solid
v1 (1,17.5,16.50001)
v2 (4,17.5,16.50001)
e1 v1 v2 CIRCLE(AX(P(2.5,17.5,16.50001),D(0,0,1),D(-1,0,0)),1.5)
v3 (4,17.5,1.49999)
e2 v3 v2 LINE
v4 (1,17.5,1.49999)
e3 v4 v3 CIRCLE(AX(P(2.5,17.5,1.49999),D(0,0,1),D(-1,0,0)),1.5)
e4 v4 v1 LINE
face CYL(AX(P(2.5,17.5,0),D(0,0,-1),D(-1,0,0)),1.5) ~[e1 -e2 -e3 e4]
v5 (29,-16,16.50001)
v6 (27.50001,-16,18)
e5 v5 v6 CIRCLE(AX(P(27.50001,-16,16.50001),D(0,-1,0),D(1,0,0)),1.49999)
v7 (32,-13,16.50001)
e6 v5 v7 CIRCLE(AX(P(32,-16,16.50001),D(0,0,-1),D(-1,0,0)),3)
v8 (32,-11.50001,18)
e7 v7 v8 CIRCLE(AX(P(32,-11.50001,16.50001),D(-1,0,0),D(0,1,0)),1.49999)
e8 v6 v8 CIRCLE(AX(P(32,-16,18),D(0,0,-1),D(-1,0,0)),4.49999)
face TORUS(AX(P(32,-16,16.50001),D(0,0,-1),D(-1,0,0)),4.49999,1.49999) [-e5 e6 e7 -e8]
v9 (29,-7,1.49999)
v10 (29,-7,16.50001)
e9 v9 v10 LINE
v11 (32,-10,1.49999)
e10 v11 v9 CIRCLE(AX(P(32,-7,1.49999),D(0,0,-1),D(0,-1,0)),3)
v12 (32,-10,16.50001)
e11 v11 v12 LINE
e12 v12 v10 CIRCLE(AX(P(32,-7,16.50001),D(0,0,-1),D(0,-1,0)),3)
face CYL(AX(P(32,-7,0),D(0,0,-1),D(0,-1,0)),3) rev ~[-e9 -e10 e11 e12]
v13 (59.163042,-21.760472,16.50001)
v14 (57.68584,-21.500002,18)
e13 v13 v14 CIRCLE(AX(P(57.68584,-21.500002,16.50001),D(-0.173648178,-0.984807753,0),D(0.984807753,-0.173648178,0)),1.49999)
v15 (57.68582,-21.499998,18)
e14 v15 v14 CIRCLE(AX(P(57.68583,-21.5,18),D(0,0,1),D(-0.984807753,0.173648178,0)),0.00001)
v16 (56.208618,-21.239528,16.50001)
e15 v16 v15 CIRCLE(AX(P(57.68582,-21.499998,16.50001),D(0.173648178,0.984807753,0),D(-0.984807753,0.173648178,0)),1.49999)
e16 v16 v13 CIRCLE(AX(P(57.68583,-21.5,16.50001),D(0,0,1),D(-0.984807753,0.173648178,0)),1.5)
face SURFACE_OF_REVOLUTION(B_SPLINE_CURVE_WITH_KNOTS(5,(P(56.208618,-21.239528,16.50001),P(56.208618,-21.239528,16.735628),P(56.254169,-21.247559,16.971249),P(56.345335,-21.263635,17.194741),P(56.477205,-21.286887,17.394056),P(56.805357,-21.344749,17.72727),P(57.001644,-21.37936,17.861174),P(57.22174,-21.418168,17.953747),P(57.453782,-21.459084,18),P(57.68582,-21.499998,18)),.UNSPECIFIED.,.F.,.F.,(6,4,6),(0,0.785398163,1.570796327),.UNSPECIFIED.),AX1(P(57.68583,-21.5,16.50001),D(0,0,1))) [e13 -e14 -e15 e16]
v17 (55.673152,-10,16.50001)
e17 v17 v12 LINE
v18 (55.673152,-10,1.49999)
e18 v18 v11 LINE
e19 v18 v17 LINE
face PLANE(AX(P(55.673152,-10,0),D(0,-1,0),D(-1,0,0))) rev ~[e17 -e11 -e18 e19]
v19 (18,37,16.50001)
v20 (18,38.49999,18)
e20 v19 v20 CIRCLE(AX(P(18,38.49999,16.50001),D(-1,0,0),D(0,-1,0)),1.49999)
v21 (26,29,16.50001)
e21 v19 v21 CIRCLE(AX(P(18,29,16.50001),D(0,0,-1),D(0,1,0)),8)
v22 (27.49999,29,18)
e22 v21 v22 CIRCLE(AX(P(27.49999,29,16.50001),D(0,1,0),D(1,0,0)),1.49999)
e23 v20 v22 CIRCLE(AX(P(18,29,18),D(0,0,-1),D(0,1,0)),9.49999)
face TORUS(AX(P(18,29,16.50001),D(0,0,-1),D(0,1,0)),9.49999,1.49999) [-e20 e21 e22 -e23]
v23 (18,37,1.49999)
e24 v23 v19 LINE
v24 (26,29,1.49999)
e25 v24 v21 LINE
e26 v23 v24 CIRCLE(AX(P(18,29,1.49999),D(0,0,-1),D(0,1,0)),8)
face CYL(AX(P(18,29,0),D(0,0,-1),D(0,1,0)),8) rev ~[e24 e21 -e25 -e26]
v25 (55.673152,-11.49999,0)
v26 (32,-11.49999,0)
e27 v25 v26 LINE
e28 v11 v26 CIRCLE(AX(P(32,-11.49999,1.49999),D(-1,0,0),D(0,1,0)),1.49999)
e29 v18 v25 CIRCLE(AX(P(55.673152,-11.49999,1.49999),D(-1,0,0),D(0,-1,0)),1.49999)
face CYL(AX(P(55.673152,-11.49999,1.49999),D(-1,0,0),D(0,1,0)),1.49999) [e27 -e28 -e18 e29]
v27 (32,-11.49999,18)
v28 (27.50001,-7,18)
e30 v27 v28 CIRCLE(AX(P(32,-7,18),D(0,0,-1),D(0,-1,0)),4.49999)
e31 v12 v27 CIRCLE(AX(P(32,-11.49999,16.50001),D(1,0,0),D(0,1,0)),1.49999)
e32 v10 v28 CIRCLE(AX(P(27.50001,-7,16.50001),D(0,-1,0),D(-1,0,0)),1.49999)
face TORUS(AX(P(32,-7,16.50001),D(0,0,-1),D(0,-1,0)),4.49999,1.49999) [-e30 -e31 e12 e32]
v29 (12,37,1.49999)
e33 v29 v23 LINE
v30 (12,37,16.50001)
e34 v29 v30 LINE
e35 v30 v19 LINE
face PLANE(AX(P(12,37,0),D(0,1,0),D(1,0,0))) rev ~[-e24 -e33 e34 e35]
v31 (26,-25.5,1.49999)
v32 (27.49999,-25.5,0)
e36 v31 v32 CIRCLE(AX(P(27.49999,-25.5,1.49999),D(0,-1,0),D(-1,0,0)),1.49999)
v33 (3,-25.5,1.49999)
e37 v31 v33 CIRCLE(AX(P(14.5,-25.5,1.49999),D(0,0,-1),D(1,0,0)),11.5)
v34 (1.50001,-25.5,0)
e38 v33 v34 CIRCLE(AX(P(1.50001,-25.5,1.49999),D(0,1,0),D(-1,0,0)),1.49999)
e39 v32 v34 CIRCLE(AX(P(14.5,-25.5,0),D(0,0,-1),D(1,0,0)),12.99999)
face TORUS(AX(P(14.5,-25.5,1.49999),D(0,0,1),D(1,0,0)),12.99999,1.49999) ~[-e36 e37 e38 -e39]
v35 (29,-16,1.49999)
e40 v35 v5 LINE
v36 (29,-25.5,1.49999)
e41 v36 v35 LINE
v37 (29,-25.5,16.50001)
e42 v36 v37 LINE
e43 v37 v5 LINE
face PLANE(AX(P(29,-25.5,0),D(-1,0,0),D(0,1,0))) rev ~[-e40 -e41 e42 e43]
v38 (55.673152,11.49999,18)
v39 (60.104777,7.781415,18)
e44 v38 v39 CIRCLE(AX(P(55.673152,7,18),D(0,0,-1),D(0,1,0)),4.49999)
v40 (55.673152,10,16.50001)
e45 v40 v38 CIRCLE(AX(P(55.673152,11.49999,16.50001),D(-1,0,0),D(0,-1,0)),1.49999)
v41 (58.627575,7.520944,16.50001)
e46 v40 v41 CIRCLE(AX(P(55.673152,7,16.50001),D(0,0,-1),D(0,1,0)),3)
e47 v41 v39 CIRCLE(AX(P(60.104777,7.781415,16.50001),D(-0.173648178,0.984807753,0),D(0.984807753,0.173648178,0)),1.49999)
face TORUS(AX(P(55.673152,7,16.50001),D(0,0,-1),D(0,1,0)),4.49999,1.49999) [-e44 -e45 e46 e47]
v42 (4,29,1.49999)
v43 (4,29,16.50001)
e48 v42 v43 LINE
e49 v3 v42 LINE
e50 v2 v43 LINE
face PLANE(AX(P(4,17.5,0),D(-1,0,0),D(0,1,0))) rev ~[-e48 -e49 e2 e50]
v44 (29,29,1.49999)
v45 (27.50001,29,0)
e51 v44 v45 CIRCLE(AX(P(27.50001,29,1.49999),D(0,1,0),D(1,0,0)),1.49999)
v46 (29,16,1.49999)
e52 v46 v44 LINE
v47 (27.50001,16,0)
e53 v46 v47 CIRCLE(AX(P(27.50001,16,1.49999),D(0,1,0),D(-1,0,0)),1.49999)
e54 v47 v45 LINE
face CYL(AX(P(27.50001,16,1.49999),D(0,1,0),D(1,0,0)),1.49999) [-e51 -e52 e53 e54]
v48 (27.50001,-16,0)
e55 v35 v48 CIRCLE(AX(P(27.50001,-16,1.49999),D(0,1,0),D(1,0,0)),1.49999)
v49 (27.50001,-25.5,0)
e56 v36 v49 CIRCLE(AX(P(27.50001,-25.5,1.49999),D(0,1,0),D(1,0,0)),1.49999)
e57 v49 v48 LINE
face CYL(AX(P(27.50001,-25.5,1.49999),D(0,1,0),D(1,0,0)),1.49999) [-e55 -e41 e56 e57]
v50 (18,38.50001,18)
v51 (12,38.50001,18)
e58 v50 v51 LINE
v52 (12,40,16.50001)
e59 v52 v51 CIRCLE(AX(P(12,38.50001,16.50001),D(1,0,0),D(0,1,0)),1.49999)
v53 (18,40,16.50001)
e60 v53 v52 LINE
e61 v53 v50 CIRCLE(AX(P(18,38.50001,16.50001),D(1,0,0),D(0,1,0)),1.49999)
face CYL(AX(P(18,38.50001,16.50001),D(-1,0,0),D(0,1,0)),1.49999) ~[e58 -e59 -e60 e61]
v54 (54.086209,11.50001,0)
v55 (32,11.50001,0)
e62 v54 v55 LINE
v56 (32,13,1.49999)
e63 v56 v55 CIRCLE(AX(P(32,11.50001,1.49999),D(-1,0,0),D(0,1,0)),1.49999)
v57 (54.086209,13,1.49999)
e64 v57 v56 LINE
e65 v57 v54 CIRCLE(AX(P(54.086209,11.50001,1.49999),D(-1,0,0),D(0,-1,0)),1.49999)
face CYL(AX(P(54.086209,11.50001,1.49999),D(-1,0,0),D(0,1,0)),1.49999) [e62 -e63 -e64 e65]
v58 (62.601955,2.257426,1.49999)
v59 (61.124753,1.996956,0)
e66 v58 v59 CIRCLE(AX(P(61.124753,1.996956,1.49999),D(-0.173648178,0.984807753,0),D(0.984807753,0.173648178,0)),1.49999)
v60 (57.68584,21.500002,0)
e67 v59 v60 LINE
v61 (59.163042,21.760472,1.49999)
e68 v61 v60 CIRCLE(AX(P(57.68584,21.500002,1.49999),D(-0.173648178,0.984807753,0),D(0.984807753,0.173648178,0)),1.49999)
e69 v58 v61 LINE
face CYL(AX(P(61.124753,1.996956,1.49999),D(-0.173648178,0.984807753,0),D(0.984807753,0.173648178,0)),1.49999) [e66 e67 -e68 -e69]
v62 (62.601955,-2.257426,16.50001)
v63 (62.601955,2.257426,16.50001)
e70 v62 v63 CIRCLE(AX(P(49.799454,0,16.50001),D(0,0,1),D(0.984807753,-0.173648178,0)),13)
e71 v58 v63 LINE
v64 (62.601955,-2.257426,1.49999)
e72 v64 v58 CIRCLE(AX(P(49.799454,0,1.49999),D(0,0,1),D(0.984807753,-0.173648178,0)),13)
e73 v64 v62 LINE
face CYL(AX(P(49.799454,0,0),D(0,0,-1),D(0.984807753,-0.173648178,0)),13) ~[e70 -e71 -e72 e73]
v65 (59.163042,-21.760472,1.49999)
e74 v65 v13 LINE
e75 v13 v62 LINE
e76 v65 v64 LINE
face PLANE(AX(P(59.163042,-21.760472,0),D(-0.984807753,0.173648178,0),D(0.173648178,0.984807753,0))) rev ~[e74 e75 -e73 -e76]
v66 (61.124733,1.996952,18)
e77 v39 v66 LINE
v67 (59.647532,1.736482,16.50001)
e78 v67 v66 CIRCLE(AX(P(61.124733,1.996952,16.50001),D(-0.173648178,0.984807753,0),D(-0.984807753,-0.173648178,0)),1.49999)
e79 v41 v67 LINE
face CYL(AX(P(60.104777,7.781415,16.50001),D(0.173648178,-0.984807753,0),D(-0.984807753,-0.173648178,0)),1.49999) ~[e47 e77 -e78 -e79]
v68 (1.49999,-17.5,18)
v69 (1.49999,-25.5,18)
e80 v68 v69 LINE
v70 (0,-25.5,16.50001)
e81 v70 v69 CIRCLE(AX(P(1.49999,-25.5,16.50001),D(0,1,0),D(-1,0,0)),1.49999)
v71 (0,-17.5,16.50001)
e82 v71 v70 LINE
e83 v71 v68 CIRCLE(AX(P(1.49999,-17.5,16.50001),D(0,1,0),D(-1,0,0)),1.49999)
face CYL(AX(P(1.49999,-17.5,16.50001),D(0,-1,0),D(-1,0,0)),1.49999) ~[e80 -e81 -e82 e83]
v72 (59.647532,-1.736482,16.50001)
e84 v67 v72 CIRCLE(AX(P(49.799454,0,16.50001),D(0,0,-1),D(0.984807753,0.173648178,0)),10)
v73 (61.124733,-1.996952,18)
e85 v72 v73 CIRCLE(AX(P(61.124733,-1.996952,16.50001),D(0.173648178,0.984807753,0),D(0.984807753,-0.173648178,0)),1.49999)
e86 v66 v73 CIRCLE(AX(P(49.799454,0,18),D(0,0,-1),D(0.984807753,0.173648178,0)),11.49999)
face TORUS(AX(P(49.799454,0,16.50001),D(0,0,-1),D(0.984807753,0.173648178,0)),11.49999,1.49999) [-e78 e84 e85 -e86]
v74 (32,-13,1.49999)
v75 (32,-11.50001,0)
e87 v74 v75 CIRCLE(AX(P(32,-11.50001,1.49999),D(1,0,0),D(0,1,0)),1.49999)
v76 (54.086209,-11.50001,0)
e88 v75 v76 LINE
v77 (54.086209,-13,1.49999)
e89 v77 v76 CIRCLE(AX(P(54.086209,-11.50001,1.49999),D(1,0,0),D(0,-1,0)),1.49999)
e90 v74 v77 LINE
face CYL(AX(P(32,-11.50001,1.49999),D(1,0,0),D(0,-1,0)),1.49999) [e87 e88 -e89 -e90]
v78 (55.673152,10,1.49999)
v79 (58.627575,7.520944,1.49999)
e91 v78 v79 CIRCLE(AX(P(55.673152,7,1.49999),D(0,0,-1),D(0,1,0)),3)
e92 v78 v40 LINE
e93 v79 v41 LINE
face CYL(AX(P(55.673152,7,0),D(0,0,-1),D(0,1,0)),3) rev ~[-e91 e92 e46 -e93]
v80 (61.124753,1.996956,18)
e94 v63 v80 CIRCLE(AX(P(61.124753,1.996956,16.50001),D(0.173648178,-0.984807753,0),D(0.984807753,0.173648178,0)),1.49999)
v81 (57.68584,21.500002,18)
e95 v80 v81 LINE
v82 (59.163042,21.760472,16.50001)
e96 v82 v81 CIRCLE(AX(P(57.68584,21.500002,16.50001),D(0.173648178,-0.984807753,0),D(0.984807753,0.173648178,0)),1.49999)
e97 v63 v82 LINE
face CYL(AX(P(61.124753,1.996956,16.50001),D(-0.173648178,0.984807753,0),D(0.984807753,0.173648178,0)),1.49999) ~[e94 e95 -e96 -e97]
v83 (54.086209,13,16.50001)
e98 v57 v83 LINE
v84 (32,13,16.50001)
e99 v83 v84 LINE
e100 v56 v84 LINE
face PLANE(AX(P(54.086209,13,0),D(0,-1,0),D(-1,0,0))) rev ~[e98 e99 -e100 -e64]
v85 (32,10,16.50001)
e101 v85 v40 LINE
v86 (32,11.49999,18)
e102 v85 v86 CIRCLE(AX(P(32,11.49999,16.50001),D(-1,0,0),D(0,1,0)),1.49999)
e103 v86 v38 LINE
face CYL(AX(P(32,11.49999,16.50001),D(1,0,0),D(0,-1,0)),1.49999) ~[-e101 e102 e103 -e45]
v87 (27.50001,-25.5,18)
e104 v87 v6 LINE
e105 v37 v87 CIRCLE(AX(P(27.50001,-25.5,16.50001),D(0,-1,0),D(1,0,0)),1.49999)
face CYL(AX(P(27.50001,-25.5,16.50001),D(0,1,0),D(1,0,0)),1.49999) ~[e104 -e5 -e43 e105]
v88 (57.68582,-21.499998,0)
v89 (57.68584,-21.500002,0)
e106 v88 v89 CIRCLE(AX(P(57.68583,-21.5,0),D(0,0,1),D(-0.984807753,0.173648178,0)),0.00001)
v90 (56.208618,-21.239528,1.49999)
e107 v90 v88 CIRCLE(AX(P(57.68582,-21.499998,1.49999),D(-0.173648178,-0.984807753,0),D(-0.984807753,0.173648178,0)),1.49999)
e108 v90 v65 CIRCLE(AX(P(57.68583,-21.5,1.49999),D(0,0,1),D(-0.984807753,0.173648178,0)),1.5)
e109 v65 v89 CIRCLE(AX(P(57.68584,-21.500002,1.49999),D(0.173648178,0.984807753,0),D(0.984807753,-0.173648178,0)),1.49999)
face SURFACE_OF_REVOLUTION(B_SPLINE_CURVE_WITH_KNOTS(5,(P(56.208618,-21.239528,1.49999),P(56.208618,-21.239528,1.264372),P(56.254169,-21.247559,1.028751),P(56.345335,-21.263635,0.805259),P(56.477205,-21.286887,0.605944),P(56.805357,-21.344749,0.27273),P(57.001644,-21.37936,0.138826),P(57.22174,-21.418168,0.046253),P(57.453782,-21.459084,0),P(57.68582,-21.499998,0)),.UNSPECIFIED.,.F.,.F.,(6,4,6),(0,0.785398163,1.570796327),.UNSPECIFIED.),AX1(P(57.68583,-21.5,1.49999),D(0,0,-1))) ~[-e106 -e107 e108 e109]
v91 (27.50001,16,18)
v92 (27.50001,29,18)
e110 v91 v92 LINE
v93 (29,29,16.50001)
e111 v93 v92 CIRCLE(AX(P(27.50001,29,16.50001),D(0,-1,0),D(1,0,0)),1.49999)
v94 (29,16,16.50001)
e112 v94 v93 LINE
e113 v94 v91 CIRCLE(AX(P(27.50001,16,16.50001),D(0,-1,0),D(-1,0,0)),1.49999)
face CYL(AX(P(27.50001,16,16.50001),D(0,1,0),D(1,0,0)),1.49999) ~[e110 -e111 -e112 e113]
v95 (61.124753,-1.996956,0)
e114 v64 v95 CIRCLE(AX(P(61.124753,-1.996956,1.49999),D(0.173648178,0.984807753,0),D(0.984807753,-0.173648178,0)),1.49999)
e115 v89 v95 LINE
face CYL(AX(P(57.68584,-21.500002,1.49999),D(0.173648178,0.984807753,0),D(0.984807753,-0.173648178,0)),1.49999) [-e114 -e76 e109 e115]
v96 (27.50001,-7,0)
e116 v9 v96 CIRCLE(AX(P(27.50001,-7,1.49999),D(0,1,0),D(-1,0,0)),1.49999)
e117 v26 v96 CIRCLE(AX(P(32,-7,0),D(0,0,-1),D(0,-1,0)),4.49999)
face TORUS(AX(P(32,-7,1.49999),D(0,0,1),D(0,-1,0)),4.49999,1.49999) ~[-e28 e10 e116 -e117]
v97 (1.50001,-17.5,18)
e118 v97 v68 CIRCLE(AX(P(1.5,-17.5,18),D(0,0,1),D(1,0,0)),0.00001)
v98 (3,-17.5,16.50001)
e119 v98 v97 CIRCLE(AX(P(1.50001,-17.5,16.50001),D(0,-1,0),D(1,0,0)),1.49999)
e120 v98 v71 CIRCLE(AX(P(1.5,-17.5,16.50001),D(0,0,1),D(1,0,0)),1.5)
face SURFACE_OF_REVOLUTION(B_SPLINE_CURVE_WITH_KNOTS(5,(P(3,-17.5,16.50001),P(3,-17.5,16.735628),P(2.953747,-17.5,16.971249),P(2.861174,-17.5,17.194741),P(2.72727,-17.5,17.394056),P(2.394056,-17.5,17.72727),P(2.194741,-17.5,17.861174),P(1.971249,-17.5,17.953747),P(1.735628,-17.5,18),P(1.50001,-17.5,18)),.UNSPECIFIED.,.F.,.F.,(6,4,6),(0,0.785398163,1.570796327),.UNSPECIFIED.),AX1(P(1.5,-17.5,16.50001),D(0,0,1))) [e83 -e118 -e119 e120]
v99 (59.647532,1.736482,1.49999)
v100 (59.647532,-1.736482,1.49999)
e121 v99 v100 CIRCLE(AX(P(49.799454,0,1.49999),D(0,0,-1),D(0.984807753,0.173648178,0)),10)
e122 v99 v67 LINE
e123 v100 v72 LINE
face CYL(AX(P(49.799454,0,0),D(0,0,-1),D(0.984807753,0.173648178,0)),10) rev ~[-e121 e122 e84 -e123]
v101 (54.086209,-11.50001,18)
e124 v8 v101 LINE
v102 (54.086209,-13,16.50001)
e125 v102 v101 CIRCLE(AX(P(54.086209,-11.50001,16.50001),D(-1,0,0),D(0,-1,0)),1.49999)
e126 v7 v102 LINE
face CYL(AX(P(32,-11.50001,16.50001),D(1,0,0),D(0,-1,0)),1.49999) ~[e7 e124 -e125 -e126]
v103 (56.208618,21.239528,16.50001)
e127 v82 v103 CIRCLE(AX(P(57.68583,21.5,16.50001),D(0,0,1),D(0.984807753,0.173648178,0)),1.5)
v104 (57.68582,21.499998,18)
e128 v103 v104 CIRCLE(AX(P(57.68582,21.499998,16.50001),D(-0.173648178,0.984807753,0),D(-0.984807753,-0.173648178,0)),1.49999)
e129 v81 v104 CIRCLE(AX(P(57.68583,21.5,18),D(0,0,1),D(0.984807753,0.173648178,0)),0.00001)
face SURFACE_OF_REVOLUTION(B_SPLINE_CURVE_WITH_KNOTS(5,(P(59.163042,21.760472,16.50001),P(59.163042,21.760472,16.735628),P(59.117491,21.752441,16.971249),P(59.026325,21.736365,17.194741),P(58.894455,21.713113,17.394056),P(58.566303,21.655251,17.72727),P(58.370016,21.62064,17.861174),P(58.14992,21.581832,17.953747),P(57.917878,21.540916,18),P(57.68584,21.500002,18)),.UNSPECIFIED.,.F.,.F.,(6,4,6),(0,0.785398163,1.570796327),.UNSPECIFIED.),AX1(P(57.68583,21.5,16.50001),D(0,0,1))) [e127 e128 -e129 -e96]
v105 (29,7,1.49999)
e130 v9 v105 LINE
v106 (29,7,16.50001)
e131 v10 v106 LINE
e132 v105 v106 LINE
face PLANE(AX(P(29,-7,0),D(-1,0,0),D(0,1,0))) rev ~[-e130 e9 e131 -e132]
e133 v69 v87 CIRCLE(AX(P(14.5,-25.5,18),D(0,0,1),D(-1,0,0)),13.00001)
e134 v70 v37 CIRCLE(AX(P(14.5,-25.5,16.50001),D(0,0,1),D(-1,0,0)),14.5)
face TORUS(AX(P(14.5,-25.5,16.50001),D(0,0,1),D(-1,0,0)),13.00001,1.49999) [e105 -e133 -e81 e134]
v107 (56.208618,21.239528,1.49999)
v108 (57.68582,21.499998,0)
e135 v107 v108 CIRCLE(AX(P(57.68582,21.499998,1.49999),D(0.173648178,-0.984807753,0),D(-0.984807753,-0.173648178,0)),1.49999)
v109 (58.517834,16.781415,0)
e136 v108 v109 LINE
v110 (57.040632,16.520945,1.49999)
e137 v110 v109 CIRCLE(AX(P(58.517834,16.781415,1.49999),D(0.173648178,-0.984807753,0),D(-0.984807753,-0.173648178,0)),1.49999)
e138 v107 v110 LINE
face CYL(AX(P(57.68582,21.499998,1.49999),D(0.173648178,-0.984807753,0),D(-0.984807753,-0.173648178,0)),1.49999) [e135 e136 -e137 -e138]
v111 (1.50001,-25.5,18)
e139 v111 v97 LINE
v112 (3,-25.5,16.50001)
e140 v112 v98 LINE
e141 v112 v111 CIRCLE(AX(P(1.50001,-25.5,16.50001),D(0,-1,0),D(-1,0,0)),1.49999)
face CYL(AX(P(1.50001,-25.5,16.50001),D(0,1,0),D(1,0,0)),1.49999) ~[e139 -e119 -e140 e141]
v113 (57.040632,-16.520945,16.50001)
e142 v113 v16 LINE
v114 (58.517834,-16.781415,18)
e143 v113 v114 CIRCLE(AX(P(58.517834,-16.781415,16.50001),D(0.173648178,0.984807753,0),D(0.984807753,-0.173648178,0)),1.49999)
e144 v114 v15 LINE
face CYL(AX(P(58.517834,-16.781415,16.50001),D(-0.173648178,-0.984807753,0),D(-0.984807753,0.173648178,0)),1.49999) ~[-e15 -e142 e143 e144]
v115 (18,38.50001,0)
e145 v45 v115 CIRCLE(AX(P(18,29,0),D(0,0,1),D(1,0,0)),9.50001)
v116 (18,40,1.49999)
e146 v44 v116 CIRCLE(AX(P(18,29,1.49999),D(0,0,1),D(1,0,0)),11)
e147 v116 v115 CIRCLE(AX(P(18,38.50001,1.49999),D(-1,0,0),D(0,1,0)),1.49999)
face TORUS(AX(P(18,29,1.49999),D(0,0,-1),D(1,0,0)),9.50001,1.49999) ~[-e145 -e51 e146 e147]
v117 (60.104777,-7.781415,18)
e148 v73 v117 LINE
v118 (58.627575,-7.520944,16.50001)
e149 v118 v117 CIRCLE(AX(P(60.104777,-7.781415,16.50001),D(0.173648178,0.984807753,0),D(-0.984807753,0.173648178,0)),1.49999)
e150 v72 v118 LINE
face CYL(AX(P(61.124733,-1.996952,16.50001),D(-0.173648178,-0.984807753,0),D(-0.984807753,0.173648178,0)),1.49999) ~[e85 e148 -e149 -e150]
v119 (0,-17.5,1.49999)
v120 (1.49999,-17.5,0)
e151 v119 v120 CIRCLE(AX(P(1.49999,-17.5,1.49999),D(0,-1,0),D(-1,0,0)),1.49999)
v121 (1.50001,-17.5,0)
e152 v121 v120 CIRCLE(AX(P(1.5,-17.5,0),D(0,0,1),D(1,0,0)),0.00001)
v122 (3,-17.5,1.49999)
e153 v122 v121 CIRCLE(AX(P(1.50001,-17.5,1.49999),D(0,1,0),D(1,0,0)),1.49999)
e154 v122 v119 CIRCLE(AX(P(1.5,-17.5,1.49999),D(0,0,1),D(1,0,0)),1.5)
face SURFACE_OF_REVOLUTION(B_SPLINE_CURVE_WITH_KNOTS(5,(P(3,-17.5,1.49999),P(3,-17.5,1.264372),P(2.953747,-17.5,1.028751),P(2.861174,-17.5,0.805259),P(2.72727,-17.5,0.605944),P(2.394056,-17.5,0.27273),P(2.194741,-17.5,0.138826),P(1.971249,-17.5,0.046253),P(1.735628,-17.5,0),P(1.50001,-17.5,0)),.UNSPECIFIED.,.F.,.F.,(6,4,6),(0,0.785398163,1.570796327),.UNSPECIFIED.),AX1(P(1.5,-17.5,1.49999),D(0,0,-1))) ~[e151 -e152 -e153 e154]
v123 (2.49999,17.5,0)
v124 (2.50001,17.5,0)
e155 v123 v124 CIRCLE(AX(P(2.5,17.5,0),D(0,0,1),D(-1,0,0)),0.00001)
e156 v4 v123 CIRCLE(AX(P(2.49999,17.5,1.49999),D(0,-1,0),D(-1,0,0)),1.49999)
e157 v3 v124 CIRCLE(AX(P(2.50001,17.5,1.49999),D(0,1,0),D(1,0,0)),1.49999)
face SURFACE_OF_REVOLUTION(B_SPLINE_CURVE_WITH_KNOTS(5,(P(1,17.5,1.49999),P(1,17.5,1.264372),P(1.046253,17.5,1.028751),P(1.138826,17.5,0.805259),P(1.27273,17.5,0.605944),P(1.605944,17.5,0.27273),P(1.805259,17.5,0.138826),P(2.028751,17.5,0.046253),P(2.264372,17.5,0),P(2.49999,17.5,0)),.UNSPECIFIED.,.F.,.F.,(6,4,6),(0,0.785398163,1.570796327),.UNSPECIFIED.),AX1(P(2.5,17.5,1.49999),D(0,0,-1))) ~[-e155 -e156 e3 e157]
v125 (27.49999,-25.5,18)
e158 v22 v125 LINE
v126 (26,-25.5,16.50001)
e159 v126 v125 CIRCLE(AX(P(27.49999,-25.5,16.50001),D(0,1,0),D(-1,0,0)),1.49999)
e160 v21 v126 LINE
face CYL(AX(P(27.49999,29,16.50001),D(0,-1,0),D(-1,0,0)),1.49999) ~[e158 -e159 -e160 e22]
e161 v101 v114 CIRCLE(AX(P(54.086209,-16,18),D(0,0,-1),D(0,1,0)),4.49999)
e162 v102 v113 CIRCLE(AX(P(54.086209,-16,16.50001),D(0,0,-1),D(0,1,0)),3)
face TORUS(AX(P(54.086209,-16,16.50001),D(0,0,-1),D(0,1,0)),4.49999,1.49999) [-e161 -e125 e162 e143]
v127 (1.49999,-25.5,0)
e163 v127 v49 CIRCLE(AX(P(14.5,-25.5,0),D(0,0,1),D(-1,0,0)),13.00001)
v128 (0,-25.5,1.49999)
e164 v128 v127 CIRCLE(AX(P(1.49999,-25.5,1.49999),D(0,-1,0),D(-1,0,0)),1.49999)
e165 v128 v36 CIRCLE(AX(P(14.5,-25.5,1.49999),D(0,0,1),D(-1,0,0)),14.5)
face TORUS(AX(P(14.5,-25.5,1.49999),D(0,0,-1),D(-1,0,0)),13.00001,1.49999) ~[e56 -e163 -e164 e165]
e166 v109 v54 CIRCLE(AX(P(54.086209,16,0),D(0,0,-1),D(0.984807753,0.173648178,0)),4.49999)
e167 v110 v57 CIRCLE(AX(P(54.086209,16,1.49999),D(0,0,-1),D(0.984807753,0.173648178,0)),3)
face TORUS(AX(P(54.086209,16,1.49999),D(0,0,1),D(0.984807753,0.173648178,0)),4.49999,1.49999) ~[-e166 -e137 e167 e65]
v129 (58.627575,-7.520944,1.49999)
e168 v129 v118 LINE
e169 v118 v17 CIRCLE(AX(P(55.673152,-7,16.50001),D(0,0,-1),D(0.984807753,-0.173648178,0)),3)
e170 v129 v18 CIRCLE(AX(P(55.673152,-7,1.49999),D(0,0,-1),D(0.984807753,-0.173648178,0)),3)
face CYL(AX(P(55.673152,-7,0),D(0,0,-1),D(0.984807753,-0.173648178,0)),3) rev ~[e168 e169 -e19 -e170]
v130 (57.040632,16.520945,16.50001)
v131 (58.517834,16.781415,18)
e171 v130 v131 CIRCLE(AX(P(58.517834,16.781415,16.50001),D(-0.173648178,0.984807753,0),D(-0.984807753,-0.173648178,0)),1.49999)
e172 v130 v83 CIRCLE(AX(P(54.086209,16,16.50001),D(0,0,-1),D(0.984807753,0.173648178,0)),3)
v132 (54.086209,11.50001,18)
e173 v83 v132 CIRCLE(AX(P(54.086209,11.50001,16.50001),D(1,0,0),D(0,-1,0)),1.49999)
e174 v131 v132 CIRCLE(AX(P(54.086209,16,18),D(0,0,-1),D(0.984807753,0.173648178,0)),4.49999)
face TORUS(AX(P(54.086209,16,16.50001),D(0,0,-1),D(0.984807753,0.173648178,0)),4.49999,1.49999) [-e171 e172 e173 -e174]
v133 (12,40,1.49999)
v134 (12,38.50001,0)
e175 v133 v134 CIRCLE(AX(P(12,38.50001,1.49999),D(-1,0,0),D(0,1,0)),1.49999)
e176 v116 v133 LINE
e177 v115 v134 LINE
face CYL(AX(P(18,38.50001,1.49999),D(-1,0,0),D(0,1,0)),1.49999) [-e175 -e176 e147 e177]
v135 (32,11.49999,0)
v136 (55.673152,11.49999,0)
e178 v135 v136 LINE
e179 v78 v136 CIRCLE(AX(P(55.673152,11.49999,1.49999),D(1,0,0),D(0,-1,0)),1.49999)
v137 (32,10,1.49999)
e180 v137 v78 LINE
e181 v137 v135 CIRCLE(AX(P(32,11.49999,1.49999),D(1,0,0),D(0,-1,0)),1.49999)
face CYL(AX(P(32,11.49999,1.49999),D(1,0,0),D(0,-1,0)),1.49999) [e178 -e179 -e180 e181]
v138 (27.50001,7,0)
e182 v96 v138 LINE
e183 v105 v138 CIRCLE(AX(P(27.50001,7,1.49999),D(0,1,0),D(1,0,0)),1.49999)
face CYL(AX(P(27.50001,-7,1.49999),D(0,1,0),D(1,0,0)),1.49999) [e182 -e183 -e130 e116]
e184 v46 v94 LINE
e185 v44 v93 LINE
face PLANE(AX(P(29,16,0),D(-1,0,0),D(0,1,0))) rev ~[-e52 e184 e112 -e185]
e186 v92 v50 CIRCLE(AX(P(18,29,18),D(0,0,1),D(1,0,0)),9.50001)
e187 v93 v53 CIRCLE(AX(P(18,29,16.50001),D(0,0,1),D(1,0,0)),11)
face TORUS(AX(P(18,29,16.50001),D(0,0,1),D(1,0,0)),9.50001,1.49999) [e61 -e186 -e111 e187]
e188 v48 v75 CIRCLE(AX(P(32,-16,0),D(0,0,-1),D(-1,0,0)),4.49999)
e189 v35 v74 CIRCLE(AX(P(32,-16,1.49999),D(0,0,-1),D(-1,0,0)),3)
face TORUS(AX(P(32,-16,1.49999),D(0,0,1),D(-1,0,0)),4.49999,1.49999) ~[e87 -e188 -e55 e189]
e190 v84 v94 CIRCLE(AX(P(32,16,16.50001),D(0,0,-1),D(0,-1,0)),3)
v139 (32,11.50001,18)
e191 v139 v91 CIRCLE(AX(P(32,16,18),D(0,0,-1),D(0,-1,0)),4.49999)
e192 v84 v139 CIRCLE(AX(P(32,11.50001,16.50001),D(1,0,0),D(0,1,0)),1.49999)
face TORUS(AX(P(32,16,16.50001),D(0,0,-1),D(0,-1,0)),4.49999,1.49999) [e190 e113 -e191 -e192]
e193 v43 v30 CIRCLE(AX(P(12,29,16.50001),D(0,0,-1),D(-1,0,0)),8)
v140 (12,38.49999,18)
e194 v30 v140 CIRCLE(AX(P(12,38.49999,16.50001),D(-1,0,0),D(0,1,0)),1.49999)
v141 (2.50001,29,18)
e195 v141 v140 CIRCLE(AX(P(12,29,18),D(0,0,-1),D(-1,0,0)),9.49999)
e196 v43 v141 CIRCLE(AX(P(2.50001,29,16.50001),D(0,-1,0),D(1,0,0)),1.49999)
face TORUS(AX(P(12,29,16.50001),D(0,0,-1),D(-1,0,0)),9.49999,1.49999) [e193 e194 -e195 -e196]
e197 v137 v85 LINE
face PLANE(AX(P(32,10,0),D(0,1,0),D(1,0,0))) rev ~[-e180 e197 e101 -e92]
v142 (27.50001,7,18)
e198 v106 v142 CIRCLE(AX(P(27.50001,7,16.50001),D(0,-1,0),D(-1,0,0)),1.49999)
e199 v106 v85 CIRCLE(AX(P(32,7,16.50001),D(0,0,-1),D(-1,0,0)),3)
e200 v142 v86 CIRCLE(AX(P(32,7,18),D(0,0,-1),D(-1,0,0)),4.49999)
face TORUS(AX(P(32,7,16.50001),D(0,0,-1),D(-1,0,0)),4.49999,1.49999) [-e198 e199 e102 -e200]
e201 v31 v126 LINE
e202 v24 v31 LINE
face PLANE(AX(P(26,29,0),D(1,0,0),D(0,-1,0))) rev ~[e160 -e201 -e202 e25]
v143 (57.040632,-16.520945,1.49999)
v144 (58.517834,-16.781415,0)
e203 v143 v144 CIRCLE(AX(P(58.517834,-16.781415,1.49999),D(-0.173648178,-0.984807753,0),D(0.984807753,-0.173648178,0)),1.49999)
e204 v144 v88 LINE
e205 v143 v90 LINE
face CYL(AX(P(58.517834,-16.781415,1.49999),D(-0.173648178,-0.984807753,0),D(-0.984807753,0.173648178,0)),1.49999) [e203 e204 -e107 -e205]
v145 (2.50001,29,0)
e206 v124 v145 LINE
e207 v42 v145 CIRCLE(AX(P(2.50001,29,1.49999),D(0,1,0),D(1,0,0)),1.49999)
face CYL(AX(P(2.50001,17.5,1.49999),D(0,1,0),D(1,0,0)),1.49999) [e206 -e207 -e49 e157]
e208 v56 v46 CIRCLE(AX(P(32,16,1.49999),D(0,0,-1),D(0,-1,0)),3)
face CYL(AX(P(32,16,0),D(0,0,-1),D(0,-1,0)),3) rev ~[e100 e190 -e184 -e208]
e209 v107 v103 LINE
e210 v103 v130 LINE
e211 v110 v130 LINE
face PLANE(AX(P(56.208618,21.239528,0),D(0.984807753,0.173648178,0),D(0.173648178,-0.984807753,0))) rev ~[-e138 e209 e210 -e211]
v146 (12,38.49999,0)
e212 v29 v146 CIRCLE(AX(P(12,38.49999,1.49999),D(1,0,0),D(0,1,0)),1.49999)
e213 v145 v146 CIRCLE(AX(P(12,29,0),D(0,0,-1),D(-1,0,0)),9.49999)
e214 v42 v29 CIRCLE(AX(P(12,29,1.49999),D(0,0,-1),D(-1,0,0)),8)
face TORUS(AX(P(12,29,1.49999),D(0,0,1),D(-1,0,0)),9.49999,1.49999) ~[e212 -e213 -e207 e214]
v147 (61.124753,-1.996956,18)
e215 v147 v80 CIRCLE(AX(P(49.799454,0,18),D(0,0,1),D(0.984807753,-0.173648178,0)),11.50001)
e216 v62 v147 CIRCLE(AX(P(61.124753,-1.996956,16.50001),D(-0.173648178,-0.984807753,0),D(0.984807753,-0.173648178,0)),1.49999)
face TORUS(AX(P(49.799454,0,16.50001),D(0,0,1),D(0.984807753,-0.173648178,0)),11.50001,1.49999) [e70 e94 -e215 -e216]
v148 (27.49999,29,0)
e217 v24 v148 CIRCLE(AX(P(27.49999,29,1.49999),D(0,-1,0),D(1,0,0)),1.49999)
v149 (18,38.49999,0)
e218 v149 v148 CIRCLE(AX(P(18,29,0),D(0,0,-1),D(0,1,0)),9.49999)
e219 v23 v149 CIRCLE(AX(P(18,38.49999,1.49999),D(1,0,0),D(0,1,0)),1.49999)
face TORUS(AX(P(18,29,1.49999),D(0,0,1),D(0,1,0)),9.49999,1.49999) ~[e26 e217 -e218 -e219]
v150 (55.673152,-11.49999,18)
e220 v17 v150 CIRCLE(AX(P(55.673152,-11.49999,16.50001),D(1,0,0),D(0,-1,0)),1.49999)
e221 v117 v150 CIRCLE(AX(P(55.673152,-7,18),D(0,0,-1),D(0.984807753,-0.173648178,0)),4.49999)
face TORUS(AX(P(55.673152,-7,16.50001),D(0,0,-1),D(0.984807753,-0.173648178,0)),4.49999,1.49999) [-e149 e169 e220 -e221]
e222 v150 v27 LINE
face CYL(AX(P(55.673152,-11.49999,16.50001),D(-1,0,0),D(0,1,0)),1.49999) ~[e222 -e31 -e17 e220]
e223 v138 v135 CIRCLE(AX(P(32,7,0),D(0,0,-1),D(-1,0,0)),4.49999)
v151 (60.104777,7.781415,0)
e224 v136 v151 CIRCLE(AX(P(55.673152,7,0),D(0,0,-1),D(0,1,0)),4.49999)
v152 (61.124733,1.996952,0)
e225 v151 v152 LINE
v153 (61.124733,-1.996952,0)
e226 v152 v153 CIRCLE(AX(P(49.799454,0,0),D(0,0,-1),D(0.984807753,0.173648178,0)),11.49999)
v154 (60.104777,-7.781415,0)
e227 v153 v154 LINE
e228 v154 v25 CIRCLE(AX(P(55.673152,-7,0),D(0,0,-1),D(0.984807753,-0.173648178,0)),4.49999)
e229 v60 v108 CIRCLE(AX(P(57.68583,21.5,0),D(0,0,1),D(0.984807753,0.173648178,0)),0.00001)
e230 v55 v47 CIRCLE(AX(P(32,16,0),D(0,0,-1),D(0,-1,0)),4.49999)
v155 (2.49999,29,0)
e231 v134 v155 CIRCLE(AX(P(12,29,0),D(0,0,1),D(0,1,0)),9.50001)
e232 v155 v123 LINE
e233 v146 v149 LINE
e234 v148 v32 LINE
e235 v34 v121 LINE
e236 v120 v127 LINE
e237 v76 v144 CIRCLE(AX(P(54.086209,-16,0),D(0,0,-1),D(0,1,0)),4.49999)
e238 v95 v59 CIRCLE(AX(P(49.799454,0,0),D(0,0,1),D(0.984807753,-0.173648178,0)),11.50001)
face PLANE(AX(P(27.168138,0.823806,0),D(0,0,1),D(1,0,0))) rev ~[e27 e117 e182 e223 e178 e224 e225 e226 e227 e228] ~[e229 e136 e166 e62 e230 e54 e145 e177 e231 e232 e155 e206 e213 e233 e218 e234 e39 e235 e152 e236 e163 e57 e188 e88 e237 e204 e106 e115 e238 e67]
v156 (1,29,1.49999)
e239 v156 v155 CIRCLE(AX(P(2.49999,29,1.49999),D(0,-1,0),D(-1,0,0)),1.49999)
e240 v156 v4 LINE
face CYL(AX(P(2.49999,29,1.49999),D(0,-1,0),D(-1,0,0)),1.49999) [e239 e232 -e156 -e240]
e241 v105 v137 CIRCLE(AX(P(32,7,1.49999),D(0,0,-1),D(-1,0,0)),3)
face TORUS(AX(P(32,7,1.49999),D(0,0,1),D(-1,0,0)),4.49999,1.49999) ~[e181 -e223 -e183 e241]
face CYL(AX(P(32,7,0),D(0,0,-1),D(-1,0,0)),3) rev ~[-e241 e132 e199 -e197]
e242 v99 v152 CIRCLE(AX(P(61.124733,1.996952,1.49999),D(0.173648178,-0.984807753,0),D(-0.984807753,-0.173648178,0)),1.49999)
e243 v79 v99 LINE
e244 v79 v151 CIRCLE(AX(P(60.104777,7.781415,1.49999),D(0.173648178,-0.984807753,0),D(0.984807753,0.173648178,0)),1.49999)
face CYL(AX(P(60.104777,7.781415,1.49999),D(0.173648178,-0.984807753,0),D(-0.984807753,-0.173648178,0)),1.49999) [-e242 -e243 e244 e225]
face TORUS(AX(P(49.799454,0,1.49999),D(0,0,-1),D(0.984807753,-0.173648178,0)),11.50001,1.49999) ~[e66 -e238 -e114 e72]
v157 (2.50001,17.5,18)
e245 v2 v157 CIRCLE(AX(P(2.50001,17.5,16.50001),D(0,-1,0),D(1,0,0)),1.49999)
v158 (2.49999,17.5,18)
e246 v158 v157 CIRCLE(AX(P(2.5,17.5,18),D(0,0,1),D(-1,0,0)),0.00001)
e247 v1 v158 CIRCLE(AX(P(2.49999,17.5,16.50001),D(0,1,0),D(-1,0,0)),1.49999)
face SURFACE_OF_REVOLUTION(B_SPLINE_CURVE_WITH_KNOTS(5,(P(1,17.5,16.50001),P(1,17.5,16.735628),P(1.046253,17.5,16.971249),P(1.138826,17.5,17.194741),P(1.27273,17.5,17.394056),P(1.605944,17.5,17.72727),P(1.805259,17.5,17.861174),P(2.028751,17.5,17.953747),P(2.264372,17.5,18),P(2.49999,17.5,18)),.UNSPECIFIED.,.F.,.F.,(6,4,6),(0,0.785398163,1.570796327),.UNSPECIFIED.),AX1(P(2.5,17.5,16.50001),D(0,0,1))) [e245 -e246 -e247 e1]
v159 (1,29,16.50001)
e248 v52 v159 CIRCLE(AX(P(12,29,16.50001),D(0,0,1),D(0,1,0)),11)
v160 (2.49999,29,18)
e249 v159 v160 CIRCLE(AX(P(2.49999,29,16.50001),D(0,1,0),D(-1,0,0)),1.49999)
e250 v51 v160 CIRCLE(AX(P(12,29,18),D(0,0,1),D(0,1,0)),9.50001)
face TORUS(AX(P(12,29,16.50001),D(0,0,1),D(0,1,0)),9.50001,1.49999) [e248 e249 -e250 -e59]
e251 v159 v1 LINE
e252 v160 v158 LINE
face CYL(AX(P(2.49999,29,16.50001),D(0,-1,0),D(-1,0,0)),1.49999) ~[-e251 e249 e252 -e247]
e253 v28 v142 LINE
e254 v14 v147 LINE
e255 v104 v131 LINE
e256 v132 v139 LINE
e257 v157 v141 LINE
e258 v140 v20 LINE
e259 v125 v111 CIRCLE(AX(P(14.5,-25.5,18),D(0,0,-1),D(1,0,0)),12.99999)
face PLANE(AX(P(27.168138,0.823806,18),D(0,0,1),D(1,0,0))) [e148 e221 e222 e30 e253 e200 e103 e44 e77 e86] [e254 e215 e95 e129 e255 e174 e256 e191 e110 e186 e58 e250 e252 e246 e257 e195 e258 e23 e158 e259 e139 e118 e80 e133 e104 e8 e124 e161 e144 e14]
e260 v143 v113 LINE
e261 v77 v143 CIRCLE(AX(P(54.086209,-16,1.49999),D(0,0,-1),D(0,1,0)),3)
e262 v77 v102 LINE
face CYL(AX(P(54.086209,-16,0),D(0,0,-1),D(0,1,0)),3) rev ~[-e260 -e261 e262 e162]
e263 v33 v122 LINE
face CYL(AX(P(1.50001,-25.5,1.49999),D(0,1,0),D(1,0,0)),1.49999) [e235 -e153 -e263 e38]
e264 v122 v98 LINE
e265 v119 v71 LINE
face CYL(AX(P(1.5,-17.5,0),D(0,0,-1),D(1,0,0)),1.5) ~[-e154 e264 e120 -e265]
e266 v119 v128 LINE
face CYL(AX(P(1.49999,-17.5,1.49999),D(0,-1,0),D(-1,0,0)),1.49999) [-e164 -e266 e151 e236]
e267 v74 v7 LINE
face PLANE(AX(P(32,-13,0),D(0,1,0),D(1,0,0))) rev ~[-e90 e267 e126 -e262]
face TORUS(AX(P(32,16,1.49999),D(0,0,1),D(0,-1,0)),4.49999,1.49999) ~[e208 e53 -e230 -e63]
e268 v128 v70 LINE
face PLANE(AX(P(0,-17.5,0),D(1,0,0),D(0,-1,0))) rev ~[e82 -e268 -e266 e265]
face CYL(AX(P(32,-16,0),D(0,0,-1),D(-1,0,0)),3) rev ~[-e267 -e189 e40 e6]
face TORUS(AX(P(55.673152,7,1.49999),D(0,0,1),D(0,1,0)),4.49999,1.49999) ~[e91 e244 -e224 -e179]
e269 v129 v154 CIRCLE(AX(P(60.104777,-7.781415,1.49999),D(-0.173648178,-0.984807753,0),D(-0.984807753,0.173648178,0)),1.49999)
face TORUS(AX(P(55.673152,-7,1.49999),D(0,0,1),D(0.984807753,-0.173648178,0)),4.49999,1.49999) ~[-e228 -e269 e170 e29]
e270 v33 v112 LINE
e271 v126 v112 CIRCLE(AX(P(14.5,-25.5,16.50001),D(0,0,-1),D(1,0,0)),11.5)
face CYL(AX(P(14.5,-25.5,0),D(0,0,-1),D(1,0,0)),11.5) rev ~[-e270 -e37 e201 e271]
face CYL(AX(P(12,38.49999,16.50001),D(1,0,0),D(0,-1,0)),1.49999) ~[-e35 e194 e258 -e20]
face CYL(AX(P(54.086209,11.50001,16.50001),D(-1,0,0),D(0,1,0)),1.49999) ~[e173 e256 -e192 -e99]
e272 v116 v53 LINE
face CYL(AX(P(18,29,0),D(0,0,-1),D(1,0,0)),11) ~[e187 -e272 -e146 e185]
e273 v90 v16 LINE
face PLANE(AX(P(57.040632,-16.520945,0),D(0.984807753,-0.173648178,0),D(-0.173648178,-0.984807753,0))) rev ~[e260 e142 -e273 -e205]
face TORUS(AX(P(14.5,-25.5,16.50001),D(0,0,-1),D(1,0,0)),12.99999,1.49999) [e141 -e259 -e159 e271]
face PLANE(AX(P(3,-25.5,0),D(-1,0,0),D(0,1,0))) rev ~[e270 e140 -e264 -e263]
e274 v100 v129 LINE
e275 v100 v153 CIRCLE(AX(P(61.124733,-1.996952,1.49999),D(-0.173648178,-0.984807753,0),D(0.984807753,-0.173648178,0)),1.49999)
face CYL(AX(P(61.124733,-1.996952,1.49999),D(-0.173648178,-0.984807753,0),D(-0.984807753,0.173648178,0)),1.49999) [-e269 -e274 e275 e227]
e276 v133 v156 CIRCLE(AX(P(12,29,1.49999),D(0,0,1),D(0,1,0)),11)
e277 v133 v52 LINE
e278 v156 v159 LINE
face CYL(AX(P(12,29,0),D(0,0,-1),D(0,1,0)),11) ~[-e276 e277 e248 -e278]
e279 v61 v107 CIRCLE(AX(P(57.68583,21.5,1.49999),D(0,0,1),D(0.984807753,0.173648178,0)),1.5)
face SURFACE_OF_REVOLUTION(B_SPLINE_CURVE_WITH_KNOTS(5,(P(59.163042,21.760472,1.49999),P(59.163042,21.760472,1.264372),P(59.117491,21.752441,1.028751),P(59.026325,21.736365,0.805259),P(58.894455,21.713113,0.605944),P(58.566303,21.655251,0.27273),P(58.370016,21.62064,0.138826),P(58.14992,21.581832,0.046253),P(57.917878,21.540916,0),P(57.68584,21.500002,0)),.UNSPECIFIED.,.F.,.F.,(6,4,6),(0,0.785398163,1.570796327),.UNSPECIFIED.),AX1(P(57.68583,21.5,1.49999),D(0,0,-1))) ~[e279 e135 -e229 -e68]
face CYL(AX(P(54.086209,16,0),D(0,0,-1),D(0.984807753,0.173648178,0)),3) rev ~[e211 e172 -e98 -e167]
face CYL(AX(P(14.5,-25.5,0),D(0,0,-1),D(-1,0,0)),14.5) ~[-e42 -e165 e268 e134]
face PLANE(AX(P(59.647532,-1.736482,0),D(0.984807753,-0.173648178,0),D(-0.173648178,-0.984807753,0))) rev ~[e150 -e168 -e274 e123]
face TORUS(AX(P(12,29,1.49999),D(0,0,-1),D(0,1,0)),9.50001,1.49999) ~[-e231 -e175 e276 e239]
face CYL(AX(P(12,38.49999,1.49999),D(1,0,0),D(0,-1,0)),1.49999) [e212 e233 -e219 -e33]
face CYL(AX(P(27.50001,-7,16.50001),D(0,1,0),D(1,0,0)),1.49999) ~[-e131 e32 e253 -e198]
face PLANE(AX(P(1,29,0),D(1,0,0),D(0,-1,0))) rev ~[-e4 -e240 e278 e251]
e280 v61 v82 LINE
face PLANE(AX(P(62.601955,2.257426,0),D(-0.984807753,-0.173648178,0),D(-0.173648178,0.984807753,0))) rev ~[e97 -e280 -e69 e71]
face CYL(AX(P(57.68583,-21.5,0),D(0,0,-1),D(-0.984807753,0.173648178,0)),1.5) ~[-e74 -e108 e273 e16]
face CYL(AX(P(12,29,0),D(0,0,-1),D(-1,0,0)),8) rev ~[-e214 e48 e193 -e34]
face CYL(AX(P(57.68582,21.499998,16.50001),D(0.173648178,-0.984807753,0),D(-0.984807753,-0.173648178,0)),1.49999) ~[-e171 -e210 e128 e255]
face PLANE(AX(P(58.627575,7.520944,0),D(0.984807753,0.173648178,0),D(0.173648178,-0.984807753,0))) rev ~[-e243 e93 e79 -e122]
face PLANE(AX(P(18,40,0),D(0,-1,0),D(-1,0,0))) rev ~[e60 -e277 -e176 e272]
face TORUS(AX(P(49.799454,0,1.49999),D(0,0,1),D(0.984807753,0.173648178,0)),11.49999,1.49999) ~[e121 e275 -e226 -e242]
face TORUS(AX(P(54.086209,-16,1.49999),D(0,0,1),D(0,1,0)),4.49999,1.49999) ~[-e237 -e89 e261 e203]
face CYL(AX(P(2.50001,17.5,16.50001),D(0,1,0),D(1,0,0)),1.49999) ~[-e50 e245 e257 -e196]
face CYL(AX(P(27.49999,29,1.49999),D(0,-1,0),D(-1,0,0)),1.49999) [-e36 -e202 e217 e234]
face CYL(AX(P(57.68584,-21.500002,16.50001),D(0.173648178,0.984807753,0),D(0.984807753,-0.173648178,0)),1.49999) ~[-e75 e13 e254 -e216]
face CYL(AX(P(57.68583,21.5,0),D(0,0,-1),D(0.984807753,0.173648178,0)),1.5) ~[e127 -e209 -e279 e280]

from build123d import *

# Parameters (mm, degrees)
F1_DEPTH = 18
F2_R     = 1.49999


# Not quite as in the source:
# - a fillet or chamfer is up to 0.001 mm smaller than in the source, because OpenCascade refuses the exact size


with BuildPart() as f1:
    # F0 (on Top) → F1 (new body)
    with BuildSketch(Plane.XY):
        with BuildLine():
            ThreePointArc((4, 29), (6.3431457505, 34.6568542495), (12, 37))
            Line((12, 37), (18, 37))
            ThreePointArc((18, 37), (23.6568542495, 34.6568542495), (26, 29))
            Line((26, 29), (26, -25.5))
            ThreePointArc((26, -25.5), (14.5, -37), (3, -25.5))
            Line((3, -25.5), (3, -17.5))
            ThreePointArc((3, -17.5), (1.5, -16), (0, -17.5))
            Line((0, -17.5), (0, -25.5))
            ThreePointArc((0, -25.5), (14.5, -40), (29, -25.5))
            Line((29, -25.5), (29, -16))
            ThreePointArc((29, -16), (29.8786796564, -13.8786796564), (32, -13))
            Line((32, -13), (54.0862086374, -13))
            ThreePointArc((54.0862086374, -13), (56.3843419667, -14.0716371709), (57.0406318964, -16.520944533))
            Line((57.0406318964, -16.520944533), (56.2086183674, -21.2395277335))
            ThreePointArc((56.2086183674, -21.2395277335), (57.4253577304, -22.9772116295), (59.1630416265, -21.7604722665))
            Line((59.1630416265, -21.7604722665), (62.6019548346, -2.2574263097))
            ThreePointArc((62.6019548346, -2.2574263097), (62.7994540455, 0), (62.6019548346, 2.2574263097))
            Line((62.6019548346, 2.2574263097), (59.1630416265, 21.7604722665))
            ThreePointArc((59.1630416265, 21.7604722665), (57.4253577304, 22.9772116295), (56.2086183674, 21.2395277335))
            Line((56.2086183674, 21.2395277335), (57.0406318964, 16.520944533))
            ThreePointArc((57.0406318964, 16.520944533), (56.3843419667, 14.0716371709), (54.0862086374, 13))
            Line((54.0862086374, 13), (32, 13))
            ThreePointArc((32, 13), (29.8786796564, 13.8786796564), (29, 16))
            Line((29, 16), (29, 29))
            ThreePointArc((29, 29), (25.7781745931, 36.7781745931), (18, 40))
            Line((18, 40), (12, 40))
            ThreePointArc((12, 40), (4.2218254069, 36.7781745931), (1, 29))
            Line((1, 29), (1, 17.5))
            ThreePointArc((1, 17.5), (2.5, 16), (4, 17.5))
            Line((4, 17.5), (4, 29))
        make_face()
        with BuildLine():
            ThreePointArc((29, 6.9999995083), (29.8786796564, 9.1213198518), (32, 9.9999995083))
            Line((32, 9.9999995083), (55.6731515504, 9.9999995083))
            ThreePointArc((55.6731515504, 9.9999995083), (57.6015143795, 9.2981328376), (58.6275748095, 7.5209440413))
            Line((58.6275748095, 7.5209440413), (59.6475315756, 1.7364817767))
            ThreePointArc((59.6475315756, 1.7364817767), (59.7994540455, 0), (59.6475315756, -1.7364817767))
            Line((59.6475315756, -1.7364817767), (58.6275748095, -7.5209440413))
            ThreePointArc((58.6275748095, -7.5209440413), (57.6015143795, -9.2981328376), (55.6731515504, -9.9999995083))
            Line((55.6731515504, -9.9999995083), (32, -9.9999995083))
            ThreePointArc((32, -9.9999995083), (29.8786796564, -9.1213198518), (29, -6.9999995083))
            Line((29, -6.9999995083), (29, 6.9999995083))
        make_face(mode=Mode.SUBTRACT)
    extrude(amount=F1_DEPTH)

    # F2 (radius 1.5 in the source; OpenCascade refuses exactly that, so slightly less here)
    f2_edges = [f1.edges().sort_by_distance(p)[0] for p in [
        (4, 23.25, 18),
        (29.87868, 9.12132, 18),
        (23.656854, 34.656854, 0),
        (43.836576, 10, 0),
    ]]
    fillet(f2_edges, radius=F2_R)


solid = f1.part
